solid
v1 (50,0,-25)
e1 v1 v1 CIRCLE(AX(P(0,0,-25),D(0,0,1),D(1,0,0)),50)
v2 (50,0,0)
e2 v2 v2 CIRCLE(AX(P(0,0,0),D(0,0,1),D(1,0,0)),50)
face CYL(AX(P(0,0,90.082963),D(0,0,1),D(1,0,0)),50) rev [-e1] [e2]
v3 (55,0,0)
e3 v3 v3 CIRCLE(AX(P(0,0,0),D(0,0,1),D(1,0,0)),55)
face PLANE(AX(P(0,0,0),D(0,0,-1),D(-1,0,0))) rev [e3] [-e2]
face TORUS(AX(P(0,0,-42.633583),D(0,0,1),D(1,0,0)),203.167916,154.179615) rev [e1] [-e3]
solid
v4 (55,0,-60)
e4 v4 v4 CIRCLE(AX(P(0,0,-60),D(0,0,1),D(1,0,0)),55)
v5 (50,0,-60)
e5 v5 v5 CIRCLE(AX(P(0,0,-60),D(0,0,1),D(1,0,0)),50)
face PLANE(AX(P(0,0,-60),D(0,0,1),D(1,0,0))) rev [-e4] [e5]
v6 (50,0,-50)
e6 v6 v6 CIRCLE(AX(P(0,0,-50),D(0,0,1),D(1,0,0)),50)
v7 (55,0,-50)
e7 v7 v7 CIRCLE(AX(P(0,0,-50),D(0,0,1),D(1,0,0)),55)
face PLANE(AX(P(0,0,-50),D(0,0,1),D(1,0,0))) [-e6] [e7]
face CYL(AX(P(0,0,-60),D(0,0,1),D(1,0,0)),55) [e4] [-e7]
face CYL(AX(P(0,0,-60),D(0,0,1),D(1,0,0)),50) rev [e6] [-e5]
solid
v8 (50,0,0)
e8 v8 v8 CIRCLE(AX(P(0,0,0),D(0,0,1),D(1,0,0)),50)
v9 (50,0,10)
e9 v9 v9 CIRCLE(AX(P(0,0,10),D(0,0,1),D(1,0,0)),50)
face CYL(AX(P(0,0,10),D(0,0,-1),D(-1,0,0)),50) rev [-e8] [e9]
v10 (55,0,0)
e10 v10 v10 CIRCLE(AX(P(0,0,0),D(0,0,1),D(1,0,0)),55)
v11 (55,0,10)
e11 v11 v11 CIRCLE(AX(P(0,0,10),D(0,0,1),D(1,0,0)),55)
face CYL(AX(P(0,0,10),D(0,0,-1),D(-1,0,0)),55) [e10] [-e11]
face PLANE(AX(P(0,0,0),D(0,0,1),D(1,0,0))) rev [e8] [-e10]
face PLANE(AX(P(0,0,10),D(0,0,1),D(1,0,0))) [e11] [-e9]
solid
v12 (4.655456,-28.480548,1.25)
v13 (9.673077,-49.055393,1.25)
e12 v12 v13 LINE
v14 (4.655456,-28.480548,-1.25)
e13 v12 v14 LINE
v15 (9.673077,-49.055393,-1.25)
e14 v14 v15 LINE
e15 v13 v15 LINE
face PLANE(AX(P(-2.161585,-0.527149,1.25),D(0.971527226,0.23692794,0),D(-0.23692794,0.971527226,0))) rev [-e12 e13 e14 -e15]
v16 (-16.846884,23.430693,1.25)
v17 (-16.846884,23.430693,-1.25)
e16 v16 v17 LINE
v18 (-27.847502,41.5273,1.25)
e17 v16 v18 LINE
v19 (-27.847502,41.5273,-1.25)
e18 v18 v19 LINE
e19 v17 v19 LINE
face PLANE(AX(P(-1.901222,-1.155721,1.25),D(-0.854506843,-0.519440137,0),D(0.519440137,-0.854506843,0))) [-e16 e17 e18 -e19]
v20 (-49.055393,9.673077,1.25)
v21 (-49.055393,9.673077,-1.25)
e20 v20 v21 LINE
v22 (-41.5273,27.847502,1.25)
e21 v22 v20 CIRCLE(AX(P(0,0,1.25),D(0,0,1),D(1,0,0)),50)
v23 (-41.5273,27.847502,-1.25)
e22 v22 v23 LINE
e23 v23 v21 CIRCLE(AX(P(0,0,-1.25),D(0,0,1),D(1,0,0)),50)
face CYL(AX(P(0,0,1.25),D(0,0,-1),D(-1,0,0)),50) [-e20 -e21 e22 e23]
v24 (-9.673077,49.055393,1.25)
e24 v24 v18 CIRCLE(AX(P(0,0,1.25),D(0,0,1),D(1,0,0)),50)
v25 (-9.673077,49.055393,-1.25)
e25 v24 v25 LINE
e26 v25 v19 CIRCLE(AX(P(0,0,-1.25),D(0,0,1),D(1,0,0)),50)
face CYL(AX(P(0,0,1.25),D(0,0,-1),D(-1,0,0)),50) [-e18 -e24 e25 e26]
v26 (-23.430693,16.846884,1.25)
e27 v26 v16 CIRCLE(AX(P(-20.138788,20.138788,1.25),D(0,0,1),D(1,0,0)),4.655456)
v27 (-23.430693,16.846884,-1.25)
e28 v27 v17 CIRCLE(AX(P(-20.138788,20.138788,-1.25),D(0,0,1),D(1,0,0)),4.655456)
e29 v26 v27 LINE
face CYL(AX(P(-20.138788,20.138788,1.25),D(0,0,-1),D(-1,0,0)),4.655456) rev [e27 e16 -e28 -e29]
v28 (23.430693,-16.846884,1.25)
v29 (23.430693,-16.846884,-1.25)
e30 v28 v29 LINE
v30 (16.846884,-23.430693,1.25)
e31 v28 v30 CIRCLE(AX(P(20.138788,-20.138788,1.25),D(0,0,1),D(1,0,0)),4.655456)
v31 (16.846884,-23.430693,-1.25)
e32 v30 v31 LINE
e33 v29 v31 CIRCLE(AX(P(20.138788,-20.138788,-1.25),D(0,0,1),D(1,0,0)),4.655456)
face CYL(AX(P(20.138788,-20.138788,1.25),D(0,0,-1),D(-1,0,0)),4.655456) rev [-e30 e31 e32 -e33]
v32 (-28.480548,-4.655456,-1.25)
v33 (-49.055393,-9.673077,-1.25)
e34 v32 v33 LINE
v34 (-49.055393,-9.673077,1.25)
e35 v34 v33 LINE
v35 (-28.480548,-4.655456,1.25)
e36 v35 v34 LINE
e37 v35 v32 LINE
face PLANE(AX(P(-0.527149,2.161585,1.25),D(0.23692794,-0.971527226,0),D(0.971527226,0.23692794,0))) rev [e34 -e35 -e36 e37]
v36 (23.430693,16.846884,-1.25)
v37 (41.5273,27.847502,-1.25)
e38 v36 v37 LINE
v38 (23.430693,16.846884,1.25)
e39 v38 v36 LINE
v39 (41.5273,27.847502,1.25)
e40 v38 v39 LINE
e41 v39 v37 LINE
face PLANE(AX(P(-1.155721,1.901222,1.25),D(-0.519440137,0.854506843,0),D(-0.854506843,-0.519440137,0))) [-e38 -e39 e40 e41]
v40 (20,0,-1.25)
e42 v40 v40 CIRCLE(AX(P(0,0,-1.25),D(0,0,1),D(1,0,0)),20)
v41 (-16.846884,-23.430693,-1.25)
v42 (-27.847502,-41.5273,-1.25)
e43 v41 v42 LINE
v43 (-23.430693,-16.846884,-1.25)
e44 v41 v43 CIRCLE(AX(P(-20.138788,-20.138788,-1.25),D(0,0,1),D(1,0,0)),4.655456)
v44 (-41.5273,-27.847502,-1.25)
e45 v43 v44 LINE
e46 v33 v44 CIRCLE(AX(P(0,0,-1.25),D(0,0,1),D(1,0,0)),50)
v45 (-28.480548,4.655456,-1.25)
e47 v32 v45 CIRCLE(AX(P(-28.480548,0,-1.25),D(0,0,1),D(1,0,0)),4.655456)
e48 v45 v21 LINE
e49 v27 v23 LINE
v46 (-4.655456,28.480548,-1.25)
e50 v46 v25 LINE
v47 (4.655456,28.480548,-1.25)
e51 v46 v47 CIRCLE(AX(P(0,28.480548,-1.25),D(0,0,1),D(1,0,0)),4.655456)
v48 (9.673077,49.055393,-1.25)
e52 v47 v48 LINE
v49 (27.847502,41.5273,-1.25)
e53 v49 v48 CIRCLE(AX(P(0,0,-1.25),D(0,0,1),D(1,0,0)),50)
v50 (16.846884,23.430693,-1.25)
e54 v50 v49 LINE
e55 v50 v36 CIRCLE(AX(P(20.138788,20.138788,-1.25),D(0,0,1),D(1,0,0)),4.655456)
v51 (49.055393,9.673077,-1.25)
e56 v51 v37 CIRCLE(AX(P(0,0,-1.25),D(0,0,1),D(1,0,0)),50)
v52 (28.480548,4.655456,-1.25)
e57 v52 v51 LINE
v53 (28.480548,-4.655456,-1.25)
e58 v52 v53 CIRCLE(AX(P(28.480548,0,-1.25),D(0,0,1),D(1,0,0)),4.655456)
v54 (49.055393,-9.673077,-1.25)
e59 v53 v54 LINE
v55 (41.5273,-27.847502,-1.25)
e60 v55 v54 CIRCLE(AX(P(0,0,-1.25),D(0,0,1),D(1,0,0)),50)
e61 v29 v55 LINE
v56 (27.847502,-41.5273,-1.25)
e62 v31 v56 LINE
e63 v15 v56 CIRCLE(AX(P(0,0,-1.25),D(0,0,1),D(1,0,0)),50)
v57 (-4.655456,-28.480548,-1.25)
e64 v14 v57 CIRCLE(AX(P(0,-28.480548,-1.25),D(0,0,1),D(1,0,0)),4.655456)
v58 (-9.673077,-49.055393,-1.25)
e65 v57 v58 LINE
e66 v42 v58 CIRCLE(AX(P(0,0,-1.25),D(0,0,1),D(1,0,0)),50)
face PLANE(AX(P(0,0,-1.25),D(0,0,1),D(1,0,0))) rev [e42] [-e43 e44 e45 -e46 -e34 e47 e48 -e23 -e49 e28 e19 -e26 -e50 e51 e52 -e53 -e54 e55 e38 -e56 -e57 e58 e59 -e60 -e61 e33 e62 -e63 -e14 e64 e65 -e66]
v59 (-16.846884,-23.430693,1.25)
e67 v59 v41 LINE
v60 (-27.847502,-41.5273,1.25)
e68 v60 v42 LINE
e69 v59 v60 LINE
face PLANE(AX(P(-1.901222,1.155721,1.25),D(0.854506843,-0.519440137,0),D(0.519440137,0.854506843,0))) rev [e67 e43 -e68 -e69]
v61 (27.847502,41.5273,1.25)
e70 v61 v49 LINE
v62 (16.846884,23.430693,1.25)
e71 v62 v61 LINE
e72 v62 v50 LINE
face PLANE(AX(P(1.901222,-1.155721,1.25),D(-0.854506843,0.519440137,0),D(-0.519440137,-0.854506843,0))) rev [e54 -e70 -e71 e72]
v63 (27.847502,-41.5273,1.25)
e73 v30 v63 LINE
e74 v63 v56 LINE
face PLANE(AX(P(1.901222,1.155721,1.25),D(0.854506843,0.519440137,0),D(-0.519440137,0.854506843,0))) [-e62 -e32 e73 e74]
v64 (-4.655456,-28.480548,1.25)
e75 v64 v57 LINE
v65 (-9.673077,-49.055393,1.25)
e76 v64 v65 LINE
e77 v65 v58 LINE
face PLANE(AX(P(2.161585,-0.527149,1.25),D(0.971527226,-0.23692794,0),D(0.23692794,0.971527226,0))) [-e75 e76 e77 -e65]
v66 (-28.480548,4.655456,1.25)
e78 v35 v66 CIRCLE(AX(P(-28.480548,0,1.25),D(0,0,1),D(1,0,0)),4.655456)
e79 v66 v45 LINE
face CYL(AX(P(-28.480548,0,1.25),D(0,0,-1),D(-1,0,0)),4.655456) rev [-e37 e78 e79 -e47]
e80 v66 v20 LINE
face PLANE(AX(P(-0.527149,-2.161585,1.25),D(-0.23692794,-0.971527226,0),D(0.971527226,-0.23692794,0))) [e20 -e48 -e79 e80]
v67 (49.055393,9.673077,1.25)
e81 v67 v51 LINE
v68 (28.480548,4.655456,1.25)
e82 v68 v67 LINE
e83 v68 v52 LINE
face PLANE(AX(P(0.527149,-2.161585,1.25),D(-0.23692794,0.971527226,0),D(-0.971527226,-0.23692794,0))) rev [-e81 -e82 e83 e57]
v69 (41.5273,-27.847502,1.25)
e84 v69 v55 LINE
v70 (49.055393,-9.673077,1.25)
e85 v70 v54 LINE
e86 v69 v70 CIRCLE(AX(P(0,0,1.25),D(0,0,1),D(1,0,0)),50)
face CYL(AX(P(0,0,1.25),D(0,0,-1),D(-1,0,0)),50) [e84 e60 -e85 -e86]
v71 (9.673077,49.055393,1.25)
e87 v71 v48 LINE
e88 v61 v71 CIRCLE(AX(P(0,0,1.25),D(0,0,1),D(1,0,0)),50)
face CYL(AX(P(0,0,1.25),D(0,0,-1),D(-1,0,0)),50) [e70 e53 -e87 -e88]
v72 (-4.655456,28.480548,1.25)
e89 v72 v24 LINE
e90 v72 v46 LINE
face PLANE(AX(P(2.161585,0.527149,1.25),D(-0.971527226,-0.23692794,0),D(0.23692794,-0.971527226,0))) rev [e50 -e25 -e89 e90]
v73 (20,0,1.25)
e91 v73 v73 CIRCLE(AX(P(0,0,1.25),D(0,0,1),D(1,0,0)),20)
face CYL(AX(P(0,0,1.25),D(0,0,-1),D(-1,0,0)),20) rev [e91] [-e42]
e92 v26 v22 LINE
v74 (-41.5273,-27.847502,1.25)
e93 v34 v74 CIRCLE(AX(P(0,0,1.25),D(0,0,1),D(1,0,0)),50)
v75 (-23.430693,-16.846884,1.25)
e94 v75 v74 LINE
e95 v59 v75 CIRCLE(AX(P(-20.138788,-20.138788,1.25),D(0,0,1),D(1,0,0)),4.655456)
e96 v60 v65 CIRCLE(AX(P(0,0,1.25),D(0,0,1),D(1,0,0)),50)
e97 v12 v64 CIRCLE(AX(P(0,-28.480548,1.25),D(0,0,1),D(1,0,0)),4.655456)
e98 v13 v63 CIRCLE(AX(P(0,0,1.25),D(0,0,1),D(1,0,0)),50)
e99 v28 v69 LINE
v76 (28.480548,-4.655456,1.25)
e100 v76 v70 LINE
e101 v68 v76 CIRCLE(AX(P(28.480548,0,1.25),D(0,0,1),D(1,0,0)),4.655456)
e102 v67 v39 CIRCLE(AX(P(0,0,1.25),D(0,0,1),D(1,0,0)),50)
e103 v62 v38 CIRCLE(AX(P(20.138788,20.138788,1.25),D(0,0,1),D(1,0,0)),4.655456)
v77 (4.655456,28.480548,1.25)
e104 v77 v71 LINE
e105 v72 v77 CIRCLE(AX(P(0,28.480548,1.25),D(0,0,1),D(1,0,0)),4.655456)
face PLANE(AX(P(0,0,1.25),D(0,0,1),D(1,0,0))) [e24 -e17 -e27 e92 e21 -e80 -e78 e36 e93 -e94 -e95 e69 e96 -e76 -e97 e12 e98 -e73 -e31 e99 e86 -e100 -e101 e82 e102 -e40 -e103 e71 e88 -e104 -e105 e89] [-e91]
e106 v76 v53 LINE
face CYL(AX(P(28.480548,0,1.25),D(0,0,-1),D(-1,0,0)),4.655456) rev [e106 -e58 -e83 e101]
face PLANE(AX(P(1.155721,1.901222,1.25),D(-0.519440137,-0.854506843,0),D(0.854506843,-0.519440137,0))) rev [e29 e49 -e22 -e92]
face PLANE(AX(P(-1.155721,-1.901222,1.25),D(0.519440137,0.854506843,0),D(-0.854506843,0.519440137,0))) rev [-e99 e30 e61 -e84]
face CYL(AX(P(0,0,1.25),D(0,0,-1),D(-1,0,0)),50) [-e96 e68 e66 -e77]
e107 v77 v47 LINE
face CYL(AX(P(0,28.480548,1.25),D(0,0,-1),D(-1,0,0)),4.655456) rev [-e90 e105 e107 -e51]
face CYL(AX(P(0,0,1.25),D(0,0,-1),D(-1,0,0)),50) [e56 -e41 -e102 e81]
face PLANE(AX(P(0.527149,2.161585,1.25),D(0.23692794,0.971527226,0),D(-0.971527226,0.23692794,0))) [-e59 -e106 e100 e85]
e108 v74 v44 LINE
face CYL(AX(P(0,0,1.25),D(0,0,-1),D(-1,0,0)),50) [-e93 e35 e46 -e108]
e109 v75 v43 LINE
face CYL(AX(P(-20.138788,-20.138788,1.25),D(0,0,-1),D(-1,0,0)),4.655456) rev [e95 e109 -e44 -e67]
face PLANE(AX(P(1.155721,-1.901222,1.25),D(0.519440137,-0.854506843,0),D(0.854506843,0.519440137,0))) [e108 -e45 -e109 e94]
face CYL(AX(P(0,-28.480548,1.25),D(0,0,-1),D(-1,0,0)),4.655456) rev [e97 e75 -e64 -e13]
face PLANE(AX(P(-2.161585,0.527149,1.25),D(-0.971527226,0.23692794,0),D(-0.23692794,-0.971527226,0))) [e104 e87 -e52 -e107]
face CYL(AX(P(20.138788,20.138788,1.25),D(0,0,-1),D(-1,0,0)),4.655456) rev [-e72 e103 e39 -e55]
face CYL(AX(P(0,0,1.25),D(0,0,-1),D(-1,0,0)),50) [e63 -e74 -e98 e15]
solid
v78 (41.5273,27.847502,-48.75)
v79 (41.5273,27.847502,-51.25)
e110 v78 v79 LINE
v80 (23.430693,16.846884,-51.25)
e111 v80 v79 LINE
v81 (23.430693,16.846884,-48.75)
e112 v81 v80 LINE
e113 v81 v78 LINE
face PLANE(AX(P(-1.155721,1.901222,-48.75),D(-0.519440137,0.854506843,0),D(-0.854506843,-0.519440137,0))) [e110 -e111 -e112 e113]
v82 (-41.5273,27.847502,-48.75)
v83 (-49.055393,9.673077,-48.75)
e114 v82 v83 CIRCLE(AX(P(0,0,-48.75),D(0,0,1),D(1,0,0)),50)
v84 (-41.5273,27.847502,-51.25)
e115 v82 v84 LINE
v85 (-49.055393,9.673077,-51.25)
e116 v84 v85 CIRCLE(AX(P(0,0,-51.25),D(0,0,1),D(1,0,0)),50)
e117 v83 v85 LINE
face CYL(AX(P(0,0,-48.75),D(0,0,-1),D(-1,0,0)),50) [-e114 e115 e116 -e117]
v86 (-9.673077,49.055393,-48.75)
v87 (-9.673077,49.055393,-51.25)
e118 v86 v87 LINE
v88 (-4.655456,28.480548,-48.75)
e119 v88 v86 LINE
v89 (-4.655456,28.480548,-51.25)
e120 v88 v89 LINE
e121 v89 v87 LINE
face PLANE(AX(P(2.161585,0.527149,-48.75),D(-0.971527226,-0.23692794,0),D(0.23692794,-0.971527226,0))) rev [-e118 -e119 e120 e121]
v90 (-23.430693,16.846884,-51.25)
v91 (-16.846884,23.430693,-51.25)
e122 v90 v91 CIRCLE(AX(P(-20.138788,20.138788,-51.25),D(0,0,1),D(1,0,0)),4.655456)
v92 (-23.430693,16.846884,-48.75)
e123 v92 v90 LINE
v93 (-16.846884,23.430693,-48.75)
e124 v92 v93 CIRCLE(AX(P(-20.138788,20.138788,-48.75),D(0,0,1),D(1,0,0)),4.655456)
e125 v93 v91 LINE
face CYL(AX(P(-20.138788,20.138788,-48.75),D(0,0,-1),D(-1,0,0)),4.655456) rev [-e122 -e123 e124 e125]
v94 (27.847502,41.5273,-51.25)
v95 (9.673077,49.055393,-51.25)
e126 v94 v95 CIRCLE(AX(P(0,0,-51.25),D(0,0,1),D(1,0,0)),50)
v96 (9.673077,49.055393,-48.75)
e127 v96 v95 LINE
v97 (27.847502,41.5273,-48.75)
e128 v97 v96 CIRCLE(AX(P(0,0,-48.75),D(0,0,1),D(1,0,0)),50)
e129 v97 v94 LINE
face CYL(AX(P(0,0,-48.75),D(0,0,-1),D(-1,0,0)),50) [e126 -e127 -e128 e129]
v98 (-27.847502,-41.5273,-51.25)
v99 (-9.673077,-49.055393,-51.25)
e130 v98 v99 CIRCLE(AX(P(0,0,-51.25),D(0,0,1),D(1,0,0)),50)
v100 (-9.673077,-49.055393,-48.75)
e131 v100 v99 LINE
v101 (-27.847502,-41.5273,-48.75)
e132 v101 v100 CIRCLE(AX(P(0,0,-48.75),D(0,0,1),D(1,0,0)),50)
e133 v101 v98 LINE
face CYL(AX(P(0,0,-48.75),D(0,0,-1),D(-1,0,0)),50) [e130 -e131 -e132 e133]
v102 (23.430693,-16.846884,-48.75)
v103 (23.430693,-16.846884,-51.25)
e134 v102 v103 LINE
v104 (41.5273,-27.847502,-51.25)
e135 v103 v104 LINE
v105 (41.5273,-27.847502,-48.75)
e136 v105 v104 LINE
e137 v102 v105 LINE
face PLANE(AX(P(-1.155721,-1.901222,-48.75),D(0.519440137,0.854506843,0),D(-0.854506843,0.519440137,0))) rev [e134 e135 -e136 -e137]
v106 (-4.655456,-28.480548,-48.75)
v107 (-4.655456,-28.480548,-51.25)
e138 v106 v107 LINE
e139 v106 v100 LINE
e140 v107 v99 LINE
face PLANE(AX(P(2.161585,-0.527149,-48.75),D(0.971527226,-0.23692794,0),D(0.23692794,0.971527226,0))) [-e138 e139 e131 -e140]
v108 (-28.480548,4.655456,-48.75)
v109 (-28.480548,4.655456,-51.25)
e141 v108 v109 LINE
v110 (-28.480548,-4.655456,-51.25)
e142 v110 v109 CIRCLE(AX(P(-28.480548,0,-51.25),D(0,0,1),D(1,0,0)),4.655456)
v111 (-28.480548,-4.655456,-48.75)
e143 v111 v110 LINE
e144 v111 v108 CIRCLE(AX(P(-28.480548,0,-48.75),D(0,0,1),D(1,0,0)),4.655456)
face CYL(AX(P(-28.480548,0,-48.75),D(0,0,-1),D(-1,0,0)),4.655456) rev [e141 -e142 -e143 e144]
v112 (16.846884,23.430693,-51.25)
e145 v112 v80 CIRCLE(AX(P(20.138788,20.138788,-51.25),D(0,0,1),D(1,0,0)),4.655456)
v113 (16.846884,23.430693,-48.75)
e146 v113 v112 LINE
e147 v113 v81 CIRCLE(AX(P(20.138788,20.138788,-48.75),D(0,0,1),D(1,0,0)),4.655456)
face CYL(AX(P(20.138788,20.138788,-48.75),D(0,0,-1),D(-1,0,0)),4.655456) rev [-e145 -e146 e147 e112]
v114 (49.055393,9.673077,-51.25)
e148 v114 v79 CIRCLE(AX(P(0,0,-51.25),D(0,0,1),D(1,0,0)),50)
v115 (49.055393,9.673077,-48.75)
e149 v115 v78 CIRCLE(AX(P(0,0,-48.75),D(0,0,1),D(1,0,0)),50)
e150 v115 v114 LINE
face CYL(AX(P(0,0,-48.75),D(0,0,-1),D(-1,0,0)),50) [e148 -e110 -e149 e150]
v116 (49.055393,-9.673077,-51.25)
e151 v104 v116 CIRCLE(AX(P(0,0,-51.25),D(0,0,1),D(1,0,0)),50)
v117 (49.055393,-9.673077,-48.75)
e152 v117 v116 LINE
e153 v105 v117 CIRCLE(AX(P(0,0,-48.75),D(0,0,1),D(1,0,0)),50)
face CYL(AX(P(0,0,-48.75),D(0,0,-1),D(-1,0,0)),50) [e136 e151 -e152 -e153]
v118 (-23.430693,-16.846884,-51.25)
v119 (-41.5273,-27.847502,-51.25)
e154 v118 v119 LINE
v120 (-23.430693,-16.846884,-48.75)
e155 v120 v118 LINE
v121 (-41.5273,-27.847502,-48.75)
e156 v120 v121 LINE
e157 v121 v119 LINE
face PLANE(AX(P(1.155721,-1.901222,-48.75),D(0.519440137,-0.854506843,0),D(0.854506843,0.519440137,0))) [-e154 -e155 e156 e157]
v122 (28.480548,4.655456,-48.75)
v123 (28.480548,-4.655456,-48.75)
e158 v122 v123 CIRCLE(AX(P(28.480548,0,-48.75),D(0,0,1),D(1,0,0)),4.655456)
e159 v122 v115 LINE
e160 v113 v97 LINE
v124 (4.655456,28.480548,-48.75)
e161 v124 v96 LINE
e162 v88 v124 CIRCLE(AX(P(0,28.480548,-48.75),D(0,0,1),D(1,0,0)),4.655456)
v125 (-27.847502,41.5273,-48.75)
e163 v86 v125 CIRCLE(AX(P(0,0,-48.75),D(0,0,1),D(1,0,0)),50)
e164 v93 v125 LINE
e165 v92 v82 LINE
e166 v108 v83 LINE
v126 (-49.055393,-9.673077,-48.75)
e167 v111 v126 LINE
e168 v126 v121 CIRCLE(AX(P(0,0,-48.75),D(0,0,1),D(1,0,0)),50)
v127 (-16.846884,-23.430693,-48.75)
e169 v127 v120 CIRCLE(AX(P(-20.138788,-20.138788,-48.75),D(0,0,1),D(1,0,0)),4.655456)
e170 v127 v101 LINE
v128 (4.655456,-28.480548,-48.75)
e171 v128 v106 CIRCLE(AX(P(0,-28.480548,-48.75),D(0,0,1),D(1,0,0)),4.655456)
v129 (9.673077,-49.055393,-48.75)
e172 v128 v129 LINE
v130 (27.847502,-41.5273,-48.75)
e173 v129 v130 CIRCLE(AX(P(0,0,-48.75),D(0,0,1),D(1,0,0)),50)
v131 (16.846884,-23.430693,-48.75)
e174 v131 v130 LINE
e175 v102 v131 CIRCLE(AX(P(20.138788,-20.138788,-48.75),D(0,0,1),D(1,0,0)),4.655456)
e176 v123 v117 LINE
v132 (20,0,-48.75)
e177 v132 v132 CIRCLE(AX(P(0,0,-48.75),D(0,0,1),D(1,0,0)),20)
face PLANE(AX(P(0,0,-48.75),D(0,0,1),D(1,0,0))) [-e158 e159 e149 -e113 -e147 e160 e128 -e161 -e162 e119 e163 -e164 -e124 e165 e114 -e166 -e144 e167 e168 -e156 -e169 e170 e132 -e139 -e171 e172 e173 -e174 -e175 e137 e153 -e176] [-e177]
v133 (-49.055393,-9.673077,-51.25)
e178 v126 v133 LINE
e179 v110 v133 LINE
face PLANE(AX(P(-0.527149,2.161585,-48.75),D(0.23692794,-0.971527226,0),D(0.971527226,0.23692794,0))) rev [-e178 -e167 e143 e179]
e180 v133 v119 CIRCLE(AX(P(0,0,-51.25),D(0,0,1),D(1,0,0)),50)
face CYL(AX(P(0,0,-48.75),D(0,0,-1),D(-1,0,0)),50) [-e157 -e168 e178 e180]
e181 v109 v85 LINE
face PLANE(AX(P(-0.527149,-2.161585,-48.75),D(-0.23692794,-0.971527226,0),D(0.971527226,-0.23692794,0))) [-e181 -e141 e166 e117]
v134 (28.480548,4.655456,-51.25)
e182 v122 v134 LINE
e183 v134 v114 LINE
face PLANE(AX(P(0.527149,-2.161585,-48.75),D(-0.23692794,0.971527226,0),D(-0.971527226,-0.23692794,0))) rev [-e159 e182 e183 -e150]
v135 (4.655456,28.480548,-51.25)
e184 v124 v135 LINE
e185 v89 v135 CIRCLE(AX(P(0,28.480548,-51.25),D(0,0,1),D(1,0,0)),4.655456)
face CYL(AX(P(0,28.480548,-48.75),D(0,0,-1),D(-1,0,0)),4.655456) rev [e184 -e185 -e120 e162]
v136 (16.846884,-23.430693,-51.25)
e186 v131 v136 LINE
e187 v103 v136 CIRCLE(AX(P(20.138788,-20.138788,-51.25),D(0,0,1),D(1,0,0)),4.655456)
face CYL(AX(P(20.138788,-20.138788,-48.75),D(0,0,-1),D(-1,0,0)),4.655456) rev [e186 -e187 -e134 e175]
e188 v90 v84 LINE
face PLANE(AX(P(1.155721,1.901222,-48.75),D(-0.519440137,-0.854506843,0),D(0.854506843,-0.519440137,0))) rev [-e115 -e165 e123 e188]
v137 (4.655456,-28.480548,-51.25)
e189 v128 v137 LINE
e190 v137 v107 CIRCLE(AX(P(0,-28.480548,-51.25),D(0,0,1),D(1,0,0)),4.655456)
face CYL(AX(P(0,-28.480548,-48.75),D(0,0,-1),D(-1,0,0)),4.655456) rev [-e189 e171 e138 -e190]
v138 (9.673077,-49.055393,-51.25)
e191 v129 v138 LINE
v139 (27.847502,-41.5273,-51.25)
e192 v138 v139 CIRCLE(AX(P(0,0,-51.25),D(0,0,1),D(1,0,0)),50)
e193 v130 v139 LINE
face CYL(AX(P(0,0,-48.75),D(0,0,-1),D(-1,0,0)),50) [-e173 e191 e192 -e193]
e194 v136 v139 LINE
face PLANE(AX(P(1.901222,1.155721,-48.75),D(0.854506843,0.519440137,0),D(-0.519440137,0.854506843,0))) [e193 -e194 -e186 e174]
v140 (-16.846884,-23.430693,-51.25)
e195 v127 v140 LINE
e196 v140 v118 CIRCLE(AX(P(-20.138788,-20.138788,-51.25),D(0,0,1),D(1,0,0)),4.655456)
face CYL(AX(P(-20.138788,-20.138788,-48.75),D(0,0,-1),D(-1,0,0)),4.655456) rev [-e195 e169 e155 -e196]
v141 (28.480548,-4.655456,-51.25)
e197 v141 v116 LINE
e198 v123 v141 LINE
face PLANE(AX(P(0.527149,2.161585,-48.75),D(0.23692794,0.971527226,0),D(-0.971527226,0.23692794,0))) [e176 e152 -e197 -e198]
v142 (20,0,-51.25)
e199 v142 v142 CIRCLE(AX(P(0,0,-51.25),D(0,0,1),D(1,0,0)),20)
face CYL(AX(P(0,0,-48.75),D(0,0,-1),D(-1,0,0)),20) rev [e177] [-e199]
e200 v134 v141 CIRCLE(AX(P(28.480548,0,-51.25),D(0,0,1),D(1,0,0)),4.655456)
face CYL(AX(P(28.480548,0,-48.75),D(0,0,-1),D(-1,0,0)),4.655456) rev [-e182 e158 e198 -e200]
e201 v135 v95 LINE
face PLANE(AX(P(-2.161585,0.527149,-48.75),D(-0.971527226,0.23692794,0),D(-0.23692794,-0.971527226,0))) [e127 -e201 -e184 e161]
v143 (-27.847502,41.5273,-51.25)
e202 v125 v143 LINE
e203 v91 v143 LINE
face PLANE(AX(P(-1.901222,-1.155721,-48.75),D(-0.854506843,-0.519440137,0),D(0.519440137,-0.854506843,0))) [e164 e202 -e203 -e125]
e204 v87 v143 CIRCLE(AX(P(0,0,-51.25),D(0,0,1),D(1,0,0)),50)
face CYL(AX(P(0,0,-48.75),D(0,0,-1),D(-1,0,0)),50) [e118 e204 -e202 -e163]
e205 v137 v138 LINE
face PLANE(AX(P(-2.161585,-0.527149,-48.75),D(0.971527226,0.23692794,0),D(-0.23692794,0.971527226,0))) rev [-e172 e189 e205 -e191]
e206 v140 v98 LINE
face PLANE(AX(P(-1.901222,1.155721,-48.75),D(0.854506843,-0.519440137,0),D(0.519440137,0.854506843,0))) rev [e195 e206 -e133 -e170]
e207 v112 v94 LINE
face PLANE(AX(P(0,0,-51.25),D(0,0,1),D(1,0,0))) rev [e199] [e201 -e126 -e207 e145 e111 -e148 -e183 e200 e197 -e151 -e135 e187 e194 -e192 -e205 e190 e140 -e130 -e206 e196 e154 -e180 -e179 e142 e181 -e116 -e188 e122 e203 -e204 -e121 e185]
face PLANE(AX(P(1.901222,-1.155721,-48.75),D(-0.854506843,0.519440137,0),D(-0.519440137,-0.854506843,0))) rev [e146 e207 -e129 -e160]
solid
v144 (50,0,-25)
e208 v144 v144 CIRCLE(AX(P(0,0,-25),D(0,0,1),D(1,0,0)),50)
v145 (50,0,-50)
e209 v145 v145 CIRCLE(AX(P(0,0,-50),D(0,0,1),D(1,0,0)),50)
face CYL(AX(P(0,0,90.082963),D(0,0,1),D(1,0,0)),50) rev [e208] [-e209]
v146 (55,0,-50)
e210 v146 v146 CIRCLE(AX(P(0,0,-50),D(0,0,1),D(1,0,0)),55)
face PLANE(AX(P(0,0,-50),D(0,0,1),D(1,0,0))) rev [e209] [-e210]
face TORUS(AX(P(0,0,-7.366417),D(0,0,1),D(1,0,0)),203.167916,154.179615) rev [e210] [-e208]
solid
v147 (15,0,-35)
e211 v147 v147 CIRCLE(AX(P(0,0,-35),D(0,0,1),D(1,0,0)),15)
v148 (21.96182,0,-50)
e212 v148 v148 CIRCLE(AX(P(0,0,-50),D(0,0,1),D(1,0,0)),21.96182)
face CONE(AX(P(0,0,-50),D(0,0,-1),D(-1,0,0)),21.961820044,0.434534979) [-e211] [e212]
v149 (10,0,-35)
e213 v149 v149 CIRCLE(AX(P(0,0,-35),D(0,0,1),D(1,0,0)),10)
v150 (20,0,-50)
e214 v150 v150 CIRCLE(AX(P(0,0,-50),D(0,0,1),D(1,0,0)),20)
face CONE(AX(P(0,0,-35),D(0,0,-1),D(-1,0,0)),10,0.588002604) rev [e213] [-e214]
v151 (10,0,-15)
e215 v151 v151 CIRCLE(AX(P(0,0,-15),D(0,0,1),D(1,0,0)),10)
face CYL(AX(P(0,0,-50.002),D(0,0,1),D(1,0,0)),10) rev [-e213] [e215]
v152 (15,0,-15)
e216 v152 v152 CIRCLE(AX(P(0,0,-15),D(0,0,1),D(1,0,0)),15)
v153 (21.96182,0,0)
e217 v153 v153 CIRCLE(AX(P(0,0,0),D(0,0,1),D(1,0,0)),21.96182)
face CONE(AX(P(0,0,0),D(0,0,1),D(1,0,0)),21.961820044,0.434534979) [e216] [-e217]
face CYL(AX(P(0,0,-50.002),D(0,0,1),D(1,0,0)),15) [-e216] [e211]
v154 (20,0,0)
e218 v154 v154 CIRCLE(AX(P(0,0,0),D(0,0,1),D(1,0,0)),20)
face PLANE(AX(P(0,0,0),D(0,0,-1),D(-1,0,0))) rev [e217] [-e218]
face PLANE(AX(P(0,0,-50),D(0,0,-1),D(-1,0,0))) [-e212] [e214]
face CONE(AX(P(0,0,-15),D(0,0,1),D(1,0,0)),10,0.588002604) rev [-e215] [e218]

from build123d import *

# Parameters (mm, degrees)
SKETCH_1_R      = 20
EXTRUDE_1_DEPTH = 1.25
SKETCH_4_R      = 20
EXTRUDE_2_DEPTH = 1.25
SKETCH_1_7_R    = 55
SKETCH_1_7_R_2  = 50
EXTRUDE_3_DEPTH = 10
SKETCH_4_4_R    = 55
SKETCH_4_4_R_2  = 50
EXTRUDE_4_DEPTH = 10
EXTRUDE_5_REACH = 91.861
SKETCH_9_R      = 15
SKETCH_9_R_2    = 10


# Read off the part's stored shape, not the designer's step: 旋轉5
with BuildPart() as part:
    # 草圖1 → 填料-伸長1 (new, symmetric)
    with BuildSketch(Plane.XY):
        with BuildLine():
            ThreePointArc((4.655456144, 28.48054769), (0, 23.825091546), (-4.655456144, 28.48054769))
            Line((-4.655456144, 28.48054769), (-9.673077437, 49.055392903))
            ThreePointArc((-9.673077437, 49.055392903), (-19.134171618, 46.193976626), (-27.847502325, 41.527299626))
            Line((-27.847502325, 41.527299626), (-16.846883794, 23.430693012))
            ThreePointArc((-16.846883794, 23.430693012), (-16.846883794, 16.846883794), (-23.430693012, 16.846883794))
            Line((-23.430693012, 16.846883794), (-41.527299626, 27.847502325))
            ThreePointArc((-41.527299626, 27.847502325), (-46.193976626, 19.134171618), (-49.055392903, 9.673077437))
            Line((-49.055392903, 9.673077437), (-28.48054769, 4.655456144))
            ThreePointArc((-28.48054769, 4.655456144), (-23.825091546, 0), (-28.48054769, -4.655456144))
            Line((-28.48054769, -4.655456144), (-49.055392903, -9.673077437))
            ThreePointArc((-49.055392903, -9.673077437), (-46.193976626, -19.134171618), (-41.527299626, -27.847502325))
            Line((-41.527299626, -27.847502325), (-23.430693012, -16.846883794))
            ThreePointArc((-23.430693012, -16.846883794), (-16.846883794, -16.846883794), (-16.846883794, -23.430693012))
            Line((-16.846883794, -23.430693012), (-27.847502325, -41.527299626))
            ThreePointArc((-27.847502325, -41.527299626), (-19.134171618, -46.193976626), (-9.673077437, -49.055392903))
            Line((-9.673077437, -49.055392903), (-4.655456144, -28.48054769))
            ThreePointArc((-4.655456144, -28.48054769), (0, -23.825091546), (4.655456144, -28.48054769))
            Line((4.655456144, -28.48054769), (9.673077437, -49.055392903))
            ThreePointArc((9.673077437, -49.055392903), (19.134171618, -46.193976626), (27.847502325, -41.527299626))
            Line((27.847502325, -41.527299626), (16.846883794, -23.430693012))
            ThreePointArc((16.846883794, -23.430693012), (16.846883794, -16.846883794), (23.430693012, -16.846883794))
            Line((23.430693012, -16.846883794), (41.527299626, -27.847502325))
            ThreePointArc((41.527299626, -27.847502325), (46.193976626, -19.134171618), (49.055392903, -9.673077437))
            Line((49.055392903, -9.673077437), (28.48054769, -4.655456144))
            ThreePointArc((28.48054769, -4.655456144), (23.825091546, 0), (28.48054769, 4.655456144))
            Line((28.48054769, 4.655456144), (49.055392903, 9.673077437))
            ThreePointArc((49.055392903, 9.673077437), (46.193976626, 19.134171618), (41.527299626, 27.847502325))
            Line((41.527299626, 27.847502325), (23.430693012, 16.846883794))
            ThreePointArc((23.430693012, 16.846883794), (16.846883794, 16.846883794), (16.846883794, 23.430693012))
            Line((16.846883794, 23.430693012), (27.847502325, 41.527299626))
            ThreePointArc((27.847502325, 41.527299626), (19.134171618, 46.193976626), (9.673077437, 49.055392903))
            Line((9.673077437, 49.055392903), (4.655456144, 28.48054769))
        make_face()
        Circle(SKETCH_1_R, mode=Mode.SUBTRACT)
    extrude(amount=EXTRUDE_1_DEPTH, both=True)


with BuildPart() as body_2:
    # 草圖4 → 填料-伸長2 (new, symmetric)
    with BuildSketch(Plane.XY.offset(-50)):
        with BuildLine():
            ThreePointArc((4.655456144, 28.48054769), (0, 23.825091546), (-4.655456144, 28.48054769))
            Line((-4.655456144, 28.48054769), (-9.673077437, 49.055392903))
            ThreePointArc((-9.673077437, 49.055392903), (-19.134171618, 46.193976626), (-27.847502325, 41.527299626))
            Line((-27.847502325, 41.527299626), (-16.846883794, 23.430693012))
            ThreePointArc((-16.846883794, 23.430693012), (-16.846883794, 16.846883794), (-23.430693012, 16.846883794))
            Line((-23.430693012, 16.846883794), (-41.527299626, 27.847502325))
            ThreePointArc((-41.527299626, 27.847502325), (-46.193976626, 19.134171618), (-49.055392903, 9.673077437))
            Line((-49.055392903, 9.673077437), (-28.48054769, 4.655456144))
            ThreePointArc((-28.48054769, 4.655456144), (-23.825091546, 0), (-28.48054769, -4.655456144))
            Line((-28.48054769, -4.655456144), (-49.055392903, -9.673077437))
            ThreePointArc((-49.055392903, -9.673077437), (-46.193976626, -19.134171618), (-41.527299626, -27.847502325))
            Line((-41.527299626, -27.847502325), (-23.430693012, -16.846883794))
            ThreePointArc((-23.430693012, -16.846883794), (-16.846883794, -16.846883794), (-16.846883794, -23.430693012))
            Line((-16.846883794, -23.430693012), (-27.847502325, -41.527299626))
            ThreePointArc((-27.847502325, -41.527299626), (-19.134171618, -46.193976626), (-9.673077437, -49.055392903))
            Line((-9.673077437, -49.055392903), (-4.655456144, -28.48054769))
            ThreePointArc((-4.655456144, -28.48054769), (0, -23.825091546), (4.655456144, -28.48054769))
            Line((4.655456144, -28.48054769), (9.673077437, -49.055392903))
            ThreePointArc((9.673077437, -49.055392903), (19.134171618, -46.193976626), (27.847502325, -41.527299626))
            Line((27.847502325, -41.527299626), (16.846883794, -23.430693012))
            ThreePointArc((16.846883794, -23.430693012), (16.846883794, -16.846883794), (23.430693012, -16.846883794))
            Line((23.430693012, -16.846883794), (41.527299626, -27.847502325))
            ThreePointArc((41.527299626, -27.847502325), (46.193976626, -19.134171618), (49.055392903, -9.673077437))
            Line((49.055392903, -9.673077437), (28.48054769, -4.655456144))
            ThreePointArc((28.48054769, -4.655456144), (23.825091546, 0), (28.48054769, 4.655456144))
            Line((28.48054769, 4.655456144), (49.055392903, 9.673077437))
            ThreePointArc((49.055392903, 9.673077437), (46.193976626, 19.134171618), (41.527299626, 27.847502325))
            Line((41.527299626, 27.847502325), (23.430693012, 16.846883794))
            ThreePointArc((23.430693012, 16.846883794), (16.846883794, 16.846883794), (16.846883794, 23.430693012))
            Line((16.846883794, 23.430693012), (27.847502325, 41.527299626))
            ThreePointArc((27.847502325, 41.527299626), (19.134171618, 46.193976626), (9.673077437, 49.055392903))
            Line((9.673077437, 49.055392903), (4.655456144, 28.48054769))
        make_face()
        Circle(SKETCH_4_R, mode=Mode.SUBTRACT)
    extrude(amount=EXTRUDE_2_DEPTH, both=True)


with BuildPart() as body_3:
    # 草圖7 → 旋轉3 (revolve)
    with BuildSketch(Plane(origin=(0, 0, 0), x_dir=(0, 0, -1), z_dir=(1, 0, 0)), mode=Mode.PRIVATE) as revolve_3_sk:
        with BuildLine():
            Line((0, 55), (0, 50))
            Line((0, 50), (25, 50))
            ThreePointArc((25, 50), (12.396472947, 51.982364734), (0, 55))
        make_face()
        with BuildLine():
            ThreePointArc((50, 55), (37.603527053, 51.982364734), (25, 50))
            Line((25, 50), (50, 50))
            Line((50, 50), (50, 55))
        make_face()
    revolve(revolve_3_sk.sketch.rotate(Axis((0, 0, 90.082962862), (0, 0, -1)), 90), axis=Axis((0, 0, 90.082962862), (0, 0, -1)))


with BuildPart() as body_4:
    # 草圖1<7> → 填料-伸長3 (new body)
    with BuildSketch(Plane.XY):
        Circle(SKETCH_1_7_R)
        Circle(SKETCH_1_7_R_2, mode=Mode.SUBTRACT)
    extrude(amount=EXTRUDE_3_DEPTH)


with BuildPart() as body_5:
    # 草圖4<4> → 填料-伸長4 (new body)
    with BuildSketch(Plane.XY.offset(-50)):
        Circle(SKETCH_4_4_R)
        Circle(SKETCH_4_4_R_2, mode=Mode.SUBTRACT)
    extrude(amount=-EXTRUDE_4_DEPTH)


with BuildPart() as body_6:
    # 旋轉5 outline → 旋轉5 (revolve)
    with BuildSketch(Plane.XZ):
        Polygon((10, -15), (15, -15), (21.961820044, 0), (20, 0), align=None)
        Polygon((20, -50), (21.961820044, -50), (15, -35), (10, -35), align=None)
    revolve(axis=Axis((0, 0, 0), (0, 0, 1)))

    # 草圖9 → 填料-伸長5 (add, up to next)
    with BuildSketch(Plane.XY.offset(-15), mode=Mode.PRIVATE) as extrude_5_sk1:
        Circle(SKETCH_9_R)
        Circle(SKETCH_9_R_2, mode=Mode.SUBTRACT)
    extrude_5_tool1 = extrude(extrude_5_sk1.sketch, amount=-EXTRUDE_5_REACH, mode=Mode.PRIVATE) - body_6.part
    add(extrude_5_tool1.solids().sort_by_distance((-14.575736, 0, -15))[0])


solid = Compound([part.part, body_2.part, body_3.part, body_4.part, body_5.part, body_6.part])
